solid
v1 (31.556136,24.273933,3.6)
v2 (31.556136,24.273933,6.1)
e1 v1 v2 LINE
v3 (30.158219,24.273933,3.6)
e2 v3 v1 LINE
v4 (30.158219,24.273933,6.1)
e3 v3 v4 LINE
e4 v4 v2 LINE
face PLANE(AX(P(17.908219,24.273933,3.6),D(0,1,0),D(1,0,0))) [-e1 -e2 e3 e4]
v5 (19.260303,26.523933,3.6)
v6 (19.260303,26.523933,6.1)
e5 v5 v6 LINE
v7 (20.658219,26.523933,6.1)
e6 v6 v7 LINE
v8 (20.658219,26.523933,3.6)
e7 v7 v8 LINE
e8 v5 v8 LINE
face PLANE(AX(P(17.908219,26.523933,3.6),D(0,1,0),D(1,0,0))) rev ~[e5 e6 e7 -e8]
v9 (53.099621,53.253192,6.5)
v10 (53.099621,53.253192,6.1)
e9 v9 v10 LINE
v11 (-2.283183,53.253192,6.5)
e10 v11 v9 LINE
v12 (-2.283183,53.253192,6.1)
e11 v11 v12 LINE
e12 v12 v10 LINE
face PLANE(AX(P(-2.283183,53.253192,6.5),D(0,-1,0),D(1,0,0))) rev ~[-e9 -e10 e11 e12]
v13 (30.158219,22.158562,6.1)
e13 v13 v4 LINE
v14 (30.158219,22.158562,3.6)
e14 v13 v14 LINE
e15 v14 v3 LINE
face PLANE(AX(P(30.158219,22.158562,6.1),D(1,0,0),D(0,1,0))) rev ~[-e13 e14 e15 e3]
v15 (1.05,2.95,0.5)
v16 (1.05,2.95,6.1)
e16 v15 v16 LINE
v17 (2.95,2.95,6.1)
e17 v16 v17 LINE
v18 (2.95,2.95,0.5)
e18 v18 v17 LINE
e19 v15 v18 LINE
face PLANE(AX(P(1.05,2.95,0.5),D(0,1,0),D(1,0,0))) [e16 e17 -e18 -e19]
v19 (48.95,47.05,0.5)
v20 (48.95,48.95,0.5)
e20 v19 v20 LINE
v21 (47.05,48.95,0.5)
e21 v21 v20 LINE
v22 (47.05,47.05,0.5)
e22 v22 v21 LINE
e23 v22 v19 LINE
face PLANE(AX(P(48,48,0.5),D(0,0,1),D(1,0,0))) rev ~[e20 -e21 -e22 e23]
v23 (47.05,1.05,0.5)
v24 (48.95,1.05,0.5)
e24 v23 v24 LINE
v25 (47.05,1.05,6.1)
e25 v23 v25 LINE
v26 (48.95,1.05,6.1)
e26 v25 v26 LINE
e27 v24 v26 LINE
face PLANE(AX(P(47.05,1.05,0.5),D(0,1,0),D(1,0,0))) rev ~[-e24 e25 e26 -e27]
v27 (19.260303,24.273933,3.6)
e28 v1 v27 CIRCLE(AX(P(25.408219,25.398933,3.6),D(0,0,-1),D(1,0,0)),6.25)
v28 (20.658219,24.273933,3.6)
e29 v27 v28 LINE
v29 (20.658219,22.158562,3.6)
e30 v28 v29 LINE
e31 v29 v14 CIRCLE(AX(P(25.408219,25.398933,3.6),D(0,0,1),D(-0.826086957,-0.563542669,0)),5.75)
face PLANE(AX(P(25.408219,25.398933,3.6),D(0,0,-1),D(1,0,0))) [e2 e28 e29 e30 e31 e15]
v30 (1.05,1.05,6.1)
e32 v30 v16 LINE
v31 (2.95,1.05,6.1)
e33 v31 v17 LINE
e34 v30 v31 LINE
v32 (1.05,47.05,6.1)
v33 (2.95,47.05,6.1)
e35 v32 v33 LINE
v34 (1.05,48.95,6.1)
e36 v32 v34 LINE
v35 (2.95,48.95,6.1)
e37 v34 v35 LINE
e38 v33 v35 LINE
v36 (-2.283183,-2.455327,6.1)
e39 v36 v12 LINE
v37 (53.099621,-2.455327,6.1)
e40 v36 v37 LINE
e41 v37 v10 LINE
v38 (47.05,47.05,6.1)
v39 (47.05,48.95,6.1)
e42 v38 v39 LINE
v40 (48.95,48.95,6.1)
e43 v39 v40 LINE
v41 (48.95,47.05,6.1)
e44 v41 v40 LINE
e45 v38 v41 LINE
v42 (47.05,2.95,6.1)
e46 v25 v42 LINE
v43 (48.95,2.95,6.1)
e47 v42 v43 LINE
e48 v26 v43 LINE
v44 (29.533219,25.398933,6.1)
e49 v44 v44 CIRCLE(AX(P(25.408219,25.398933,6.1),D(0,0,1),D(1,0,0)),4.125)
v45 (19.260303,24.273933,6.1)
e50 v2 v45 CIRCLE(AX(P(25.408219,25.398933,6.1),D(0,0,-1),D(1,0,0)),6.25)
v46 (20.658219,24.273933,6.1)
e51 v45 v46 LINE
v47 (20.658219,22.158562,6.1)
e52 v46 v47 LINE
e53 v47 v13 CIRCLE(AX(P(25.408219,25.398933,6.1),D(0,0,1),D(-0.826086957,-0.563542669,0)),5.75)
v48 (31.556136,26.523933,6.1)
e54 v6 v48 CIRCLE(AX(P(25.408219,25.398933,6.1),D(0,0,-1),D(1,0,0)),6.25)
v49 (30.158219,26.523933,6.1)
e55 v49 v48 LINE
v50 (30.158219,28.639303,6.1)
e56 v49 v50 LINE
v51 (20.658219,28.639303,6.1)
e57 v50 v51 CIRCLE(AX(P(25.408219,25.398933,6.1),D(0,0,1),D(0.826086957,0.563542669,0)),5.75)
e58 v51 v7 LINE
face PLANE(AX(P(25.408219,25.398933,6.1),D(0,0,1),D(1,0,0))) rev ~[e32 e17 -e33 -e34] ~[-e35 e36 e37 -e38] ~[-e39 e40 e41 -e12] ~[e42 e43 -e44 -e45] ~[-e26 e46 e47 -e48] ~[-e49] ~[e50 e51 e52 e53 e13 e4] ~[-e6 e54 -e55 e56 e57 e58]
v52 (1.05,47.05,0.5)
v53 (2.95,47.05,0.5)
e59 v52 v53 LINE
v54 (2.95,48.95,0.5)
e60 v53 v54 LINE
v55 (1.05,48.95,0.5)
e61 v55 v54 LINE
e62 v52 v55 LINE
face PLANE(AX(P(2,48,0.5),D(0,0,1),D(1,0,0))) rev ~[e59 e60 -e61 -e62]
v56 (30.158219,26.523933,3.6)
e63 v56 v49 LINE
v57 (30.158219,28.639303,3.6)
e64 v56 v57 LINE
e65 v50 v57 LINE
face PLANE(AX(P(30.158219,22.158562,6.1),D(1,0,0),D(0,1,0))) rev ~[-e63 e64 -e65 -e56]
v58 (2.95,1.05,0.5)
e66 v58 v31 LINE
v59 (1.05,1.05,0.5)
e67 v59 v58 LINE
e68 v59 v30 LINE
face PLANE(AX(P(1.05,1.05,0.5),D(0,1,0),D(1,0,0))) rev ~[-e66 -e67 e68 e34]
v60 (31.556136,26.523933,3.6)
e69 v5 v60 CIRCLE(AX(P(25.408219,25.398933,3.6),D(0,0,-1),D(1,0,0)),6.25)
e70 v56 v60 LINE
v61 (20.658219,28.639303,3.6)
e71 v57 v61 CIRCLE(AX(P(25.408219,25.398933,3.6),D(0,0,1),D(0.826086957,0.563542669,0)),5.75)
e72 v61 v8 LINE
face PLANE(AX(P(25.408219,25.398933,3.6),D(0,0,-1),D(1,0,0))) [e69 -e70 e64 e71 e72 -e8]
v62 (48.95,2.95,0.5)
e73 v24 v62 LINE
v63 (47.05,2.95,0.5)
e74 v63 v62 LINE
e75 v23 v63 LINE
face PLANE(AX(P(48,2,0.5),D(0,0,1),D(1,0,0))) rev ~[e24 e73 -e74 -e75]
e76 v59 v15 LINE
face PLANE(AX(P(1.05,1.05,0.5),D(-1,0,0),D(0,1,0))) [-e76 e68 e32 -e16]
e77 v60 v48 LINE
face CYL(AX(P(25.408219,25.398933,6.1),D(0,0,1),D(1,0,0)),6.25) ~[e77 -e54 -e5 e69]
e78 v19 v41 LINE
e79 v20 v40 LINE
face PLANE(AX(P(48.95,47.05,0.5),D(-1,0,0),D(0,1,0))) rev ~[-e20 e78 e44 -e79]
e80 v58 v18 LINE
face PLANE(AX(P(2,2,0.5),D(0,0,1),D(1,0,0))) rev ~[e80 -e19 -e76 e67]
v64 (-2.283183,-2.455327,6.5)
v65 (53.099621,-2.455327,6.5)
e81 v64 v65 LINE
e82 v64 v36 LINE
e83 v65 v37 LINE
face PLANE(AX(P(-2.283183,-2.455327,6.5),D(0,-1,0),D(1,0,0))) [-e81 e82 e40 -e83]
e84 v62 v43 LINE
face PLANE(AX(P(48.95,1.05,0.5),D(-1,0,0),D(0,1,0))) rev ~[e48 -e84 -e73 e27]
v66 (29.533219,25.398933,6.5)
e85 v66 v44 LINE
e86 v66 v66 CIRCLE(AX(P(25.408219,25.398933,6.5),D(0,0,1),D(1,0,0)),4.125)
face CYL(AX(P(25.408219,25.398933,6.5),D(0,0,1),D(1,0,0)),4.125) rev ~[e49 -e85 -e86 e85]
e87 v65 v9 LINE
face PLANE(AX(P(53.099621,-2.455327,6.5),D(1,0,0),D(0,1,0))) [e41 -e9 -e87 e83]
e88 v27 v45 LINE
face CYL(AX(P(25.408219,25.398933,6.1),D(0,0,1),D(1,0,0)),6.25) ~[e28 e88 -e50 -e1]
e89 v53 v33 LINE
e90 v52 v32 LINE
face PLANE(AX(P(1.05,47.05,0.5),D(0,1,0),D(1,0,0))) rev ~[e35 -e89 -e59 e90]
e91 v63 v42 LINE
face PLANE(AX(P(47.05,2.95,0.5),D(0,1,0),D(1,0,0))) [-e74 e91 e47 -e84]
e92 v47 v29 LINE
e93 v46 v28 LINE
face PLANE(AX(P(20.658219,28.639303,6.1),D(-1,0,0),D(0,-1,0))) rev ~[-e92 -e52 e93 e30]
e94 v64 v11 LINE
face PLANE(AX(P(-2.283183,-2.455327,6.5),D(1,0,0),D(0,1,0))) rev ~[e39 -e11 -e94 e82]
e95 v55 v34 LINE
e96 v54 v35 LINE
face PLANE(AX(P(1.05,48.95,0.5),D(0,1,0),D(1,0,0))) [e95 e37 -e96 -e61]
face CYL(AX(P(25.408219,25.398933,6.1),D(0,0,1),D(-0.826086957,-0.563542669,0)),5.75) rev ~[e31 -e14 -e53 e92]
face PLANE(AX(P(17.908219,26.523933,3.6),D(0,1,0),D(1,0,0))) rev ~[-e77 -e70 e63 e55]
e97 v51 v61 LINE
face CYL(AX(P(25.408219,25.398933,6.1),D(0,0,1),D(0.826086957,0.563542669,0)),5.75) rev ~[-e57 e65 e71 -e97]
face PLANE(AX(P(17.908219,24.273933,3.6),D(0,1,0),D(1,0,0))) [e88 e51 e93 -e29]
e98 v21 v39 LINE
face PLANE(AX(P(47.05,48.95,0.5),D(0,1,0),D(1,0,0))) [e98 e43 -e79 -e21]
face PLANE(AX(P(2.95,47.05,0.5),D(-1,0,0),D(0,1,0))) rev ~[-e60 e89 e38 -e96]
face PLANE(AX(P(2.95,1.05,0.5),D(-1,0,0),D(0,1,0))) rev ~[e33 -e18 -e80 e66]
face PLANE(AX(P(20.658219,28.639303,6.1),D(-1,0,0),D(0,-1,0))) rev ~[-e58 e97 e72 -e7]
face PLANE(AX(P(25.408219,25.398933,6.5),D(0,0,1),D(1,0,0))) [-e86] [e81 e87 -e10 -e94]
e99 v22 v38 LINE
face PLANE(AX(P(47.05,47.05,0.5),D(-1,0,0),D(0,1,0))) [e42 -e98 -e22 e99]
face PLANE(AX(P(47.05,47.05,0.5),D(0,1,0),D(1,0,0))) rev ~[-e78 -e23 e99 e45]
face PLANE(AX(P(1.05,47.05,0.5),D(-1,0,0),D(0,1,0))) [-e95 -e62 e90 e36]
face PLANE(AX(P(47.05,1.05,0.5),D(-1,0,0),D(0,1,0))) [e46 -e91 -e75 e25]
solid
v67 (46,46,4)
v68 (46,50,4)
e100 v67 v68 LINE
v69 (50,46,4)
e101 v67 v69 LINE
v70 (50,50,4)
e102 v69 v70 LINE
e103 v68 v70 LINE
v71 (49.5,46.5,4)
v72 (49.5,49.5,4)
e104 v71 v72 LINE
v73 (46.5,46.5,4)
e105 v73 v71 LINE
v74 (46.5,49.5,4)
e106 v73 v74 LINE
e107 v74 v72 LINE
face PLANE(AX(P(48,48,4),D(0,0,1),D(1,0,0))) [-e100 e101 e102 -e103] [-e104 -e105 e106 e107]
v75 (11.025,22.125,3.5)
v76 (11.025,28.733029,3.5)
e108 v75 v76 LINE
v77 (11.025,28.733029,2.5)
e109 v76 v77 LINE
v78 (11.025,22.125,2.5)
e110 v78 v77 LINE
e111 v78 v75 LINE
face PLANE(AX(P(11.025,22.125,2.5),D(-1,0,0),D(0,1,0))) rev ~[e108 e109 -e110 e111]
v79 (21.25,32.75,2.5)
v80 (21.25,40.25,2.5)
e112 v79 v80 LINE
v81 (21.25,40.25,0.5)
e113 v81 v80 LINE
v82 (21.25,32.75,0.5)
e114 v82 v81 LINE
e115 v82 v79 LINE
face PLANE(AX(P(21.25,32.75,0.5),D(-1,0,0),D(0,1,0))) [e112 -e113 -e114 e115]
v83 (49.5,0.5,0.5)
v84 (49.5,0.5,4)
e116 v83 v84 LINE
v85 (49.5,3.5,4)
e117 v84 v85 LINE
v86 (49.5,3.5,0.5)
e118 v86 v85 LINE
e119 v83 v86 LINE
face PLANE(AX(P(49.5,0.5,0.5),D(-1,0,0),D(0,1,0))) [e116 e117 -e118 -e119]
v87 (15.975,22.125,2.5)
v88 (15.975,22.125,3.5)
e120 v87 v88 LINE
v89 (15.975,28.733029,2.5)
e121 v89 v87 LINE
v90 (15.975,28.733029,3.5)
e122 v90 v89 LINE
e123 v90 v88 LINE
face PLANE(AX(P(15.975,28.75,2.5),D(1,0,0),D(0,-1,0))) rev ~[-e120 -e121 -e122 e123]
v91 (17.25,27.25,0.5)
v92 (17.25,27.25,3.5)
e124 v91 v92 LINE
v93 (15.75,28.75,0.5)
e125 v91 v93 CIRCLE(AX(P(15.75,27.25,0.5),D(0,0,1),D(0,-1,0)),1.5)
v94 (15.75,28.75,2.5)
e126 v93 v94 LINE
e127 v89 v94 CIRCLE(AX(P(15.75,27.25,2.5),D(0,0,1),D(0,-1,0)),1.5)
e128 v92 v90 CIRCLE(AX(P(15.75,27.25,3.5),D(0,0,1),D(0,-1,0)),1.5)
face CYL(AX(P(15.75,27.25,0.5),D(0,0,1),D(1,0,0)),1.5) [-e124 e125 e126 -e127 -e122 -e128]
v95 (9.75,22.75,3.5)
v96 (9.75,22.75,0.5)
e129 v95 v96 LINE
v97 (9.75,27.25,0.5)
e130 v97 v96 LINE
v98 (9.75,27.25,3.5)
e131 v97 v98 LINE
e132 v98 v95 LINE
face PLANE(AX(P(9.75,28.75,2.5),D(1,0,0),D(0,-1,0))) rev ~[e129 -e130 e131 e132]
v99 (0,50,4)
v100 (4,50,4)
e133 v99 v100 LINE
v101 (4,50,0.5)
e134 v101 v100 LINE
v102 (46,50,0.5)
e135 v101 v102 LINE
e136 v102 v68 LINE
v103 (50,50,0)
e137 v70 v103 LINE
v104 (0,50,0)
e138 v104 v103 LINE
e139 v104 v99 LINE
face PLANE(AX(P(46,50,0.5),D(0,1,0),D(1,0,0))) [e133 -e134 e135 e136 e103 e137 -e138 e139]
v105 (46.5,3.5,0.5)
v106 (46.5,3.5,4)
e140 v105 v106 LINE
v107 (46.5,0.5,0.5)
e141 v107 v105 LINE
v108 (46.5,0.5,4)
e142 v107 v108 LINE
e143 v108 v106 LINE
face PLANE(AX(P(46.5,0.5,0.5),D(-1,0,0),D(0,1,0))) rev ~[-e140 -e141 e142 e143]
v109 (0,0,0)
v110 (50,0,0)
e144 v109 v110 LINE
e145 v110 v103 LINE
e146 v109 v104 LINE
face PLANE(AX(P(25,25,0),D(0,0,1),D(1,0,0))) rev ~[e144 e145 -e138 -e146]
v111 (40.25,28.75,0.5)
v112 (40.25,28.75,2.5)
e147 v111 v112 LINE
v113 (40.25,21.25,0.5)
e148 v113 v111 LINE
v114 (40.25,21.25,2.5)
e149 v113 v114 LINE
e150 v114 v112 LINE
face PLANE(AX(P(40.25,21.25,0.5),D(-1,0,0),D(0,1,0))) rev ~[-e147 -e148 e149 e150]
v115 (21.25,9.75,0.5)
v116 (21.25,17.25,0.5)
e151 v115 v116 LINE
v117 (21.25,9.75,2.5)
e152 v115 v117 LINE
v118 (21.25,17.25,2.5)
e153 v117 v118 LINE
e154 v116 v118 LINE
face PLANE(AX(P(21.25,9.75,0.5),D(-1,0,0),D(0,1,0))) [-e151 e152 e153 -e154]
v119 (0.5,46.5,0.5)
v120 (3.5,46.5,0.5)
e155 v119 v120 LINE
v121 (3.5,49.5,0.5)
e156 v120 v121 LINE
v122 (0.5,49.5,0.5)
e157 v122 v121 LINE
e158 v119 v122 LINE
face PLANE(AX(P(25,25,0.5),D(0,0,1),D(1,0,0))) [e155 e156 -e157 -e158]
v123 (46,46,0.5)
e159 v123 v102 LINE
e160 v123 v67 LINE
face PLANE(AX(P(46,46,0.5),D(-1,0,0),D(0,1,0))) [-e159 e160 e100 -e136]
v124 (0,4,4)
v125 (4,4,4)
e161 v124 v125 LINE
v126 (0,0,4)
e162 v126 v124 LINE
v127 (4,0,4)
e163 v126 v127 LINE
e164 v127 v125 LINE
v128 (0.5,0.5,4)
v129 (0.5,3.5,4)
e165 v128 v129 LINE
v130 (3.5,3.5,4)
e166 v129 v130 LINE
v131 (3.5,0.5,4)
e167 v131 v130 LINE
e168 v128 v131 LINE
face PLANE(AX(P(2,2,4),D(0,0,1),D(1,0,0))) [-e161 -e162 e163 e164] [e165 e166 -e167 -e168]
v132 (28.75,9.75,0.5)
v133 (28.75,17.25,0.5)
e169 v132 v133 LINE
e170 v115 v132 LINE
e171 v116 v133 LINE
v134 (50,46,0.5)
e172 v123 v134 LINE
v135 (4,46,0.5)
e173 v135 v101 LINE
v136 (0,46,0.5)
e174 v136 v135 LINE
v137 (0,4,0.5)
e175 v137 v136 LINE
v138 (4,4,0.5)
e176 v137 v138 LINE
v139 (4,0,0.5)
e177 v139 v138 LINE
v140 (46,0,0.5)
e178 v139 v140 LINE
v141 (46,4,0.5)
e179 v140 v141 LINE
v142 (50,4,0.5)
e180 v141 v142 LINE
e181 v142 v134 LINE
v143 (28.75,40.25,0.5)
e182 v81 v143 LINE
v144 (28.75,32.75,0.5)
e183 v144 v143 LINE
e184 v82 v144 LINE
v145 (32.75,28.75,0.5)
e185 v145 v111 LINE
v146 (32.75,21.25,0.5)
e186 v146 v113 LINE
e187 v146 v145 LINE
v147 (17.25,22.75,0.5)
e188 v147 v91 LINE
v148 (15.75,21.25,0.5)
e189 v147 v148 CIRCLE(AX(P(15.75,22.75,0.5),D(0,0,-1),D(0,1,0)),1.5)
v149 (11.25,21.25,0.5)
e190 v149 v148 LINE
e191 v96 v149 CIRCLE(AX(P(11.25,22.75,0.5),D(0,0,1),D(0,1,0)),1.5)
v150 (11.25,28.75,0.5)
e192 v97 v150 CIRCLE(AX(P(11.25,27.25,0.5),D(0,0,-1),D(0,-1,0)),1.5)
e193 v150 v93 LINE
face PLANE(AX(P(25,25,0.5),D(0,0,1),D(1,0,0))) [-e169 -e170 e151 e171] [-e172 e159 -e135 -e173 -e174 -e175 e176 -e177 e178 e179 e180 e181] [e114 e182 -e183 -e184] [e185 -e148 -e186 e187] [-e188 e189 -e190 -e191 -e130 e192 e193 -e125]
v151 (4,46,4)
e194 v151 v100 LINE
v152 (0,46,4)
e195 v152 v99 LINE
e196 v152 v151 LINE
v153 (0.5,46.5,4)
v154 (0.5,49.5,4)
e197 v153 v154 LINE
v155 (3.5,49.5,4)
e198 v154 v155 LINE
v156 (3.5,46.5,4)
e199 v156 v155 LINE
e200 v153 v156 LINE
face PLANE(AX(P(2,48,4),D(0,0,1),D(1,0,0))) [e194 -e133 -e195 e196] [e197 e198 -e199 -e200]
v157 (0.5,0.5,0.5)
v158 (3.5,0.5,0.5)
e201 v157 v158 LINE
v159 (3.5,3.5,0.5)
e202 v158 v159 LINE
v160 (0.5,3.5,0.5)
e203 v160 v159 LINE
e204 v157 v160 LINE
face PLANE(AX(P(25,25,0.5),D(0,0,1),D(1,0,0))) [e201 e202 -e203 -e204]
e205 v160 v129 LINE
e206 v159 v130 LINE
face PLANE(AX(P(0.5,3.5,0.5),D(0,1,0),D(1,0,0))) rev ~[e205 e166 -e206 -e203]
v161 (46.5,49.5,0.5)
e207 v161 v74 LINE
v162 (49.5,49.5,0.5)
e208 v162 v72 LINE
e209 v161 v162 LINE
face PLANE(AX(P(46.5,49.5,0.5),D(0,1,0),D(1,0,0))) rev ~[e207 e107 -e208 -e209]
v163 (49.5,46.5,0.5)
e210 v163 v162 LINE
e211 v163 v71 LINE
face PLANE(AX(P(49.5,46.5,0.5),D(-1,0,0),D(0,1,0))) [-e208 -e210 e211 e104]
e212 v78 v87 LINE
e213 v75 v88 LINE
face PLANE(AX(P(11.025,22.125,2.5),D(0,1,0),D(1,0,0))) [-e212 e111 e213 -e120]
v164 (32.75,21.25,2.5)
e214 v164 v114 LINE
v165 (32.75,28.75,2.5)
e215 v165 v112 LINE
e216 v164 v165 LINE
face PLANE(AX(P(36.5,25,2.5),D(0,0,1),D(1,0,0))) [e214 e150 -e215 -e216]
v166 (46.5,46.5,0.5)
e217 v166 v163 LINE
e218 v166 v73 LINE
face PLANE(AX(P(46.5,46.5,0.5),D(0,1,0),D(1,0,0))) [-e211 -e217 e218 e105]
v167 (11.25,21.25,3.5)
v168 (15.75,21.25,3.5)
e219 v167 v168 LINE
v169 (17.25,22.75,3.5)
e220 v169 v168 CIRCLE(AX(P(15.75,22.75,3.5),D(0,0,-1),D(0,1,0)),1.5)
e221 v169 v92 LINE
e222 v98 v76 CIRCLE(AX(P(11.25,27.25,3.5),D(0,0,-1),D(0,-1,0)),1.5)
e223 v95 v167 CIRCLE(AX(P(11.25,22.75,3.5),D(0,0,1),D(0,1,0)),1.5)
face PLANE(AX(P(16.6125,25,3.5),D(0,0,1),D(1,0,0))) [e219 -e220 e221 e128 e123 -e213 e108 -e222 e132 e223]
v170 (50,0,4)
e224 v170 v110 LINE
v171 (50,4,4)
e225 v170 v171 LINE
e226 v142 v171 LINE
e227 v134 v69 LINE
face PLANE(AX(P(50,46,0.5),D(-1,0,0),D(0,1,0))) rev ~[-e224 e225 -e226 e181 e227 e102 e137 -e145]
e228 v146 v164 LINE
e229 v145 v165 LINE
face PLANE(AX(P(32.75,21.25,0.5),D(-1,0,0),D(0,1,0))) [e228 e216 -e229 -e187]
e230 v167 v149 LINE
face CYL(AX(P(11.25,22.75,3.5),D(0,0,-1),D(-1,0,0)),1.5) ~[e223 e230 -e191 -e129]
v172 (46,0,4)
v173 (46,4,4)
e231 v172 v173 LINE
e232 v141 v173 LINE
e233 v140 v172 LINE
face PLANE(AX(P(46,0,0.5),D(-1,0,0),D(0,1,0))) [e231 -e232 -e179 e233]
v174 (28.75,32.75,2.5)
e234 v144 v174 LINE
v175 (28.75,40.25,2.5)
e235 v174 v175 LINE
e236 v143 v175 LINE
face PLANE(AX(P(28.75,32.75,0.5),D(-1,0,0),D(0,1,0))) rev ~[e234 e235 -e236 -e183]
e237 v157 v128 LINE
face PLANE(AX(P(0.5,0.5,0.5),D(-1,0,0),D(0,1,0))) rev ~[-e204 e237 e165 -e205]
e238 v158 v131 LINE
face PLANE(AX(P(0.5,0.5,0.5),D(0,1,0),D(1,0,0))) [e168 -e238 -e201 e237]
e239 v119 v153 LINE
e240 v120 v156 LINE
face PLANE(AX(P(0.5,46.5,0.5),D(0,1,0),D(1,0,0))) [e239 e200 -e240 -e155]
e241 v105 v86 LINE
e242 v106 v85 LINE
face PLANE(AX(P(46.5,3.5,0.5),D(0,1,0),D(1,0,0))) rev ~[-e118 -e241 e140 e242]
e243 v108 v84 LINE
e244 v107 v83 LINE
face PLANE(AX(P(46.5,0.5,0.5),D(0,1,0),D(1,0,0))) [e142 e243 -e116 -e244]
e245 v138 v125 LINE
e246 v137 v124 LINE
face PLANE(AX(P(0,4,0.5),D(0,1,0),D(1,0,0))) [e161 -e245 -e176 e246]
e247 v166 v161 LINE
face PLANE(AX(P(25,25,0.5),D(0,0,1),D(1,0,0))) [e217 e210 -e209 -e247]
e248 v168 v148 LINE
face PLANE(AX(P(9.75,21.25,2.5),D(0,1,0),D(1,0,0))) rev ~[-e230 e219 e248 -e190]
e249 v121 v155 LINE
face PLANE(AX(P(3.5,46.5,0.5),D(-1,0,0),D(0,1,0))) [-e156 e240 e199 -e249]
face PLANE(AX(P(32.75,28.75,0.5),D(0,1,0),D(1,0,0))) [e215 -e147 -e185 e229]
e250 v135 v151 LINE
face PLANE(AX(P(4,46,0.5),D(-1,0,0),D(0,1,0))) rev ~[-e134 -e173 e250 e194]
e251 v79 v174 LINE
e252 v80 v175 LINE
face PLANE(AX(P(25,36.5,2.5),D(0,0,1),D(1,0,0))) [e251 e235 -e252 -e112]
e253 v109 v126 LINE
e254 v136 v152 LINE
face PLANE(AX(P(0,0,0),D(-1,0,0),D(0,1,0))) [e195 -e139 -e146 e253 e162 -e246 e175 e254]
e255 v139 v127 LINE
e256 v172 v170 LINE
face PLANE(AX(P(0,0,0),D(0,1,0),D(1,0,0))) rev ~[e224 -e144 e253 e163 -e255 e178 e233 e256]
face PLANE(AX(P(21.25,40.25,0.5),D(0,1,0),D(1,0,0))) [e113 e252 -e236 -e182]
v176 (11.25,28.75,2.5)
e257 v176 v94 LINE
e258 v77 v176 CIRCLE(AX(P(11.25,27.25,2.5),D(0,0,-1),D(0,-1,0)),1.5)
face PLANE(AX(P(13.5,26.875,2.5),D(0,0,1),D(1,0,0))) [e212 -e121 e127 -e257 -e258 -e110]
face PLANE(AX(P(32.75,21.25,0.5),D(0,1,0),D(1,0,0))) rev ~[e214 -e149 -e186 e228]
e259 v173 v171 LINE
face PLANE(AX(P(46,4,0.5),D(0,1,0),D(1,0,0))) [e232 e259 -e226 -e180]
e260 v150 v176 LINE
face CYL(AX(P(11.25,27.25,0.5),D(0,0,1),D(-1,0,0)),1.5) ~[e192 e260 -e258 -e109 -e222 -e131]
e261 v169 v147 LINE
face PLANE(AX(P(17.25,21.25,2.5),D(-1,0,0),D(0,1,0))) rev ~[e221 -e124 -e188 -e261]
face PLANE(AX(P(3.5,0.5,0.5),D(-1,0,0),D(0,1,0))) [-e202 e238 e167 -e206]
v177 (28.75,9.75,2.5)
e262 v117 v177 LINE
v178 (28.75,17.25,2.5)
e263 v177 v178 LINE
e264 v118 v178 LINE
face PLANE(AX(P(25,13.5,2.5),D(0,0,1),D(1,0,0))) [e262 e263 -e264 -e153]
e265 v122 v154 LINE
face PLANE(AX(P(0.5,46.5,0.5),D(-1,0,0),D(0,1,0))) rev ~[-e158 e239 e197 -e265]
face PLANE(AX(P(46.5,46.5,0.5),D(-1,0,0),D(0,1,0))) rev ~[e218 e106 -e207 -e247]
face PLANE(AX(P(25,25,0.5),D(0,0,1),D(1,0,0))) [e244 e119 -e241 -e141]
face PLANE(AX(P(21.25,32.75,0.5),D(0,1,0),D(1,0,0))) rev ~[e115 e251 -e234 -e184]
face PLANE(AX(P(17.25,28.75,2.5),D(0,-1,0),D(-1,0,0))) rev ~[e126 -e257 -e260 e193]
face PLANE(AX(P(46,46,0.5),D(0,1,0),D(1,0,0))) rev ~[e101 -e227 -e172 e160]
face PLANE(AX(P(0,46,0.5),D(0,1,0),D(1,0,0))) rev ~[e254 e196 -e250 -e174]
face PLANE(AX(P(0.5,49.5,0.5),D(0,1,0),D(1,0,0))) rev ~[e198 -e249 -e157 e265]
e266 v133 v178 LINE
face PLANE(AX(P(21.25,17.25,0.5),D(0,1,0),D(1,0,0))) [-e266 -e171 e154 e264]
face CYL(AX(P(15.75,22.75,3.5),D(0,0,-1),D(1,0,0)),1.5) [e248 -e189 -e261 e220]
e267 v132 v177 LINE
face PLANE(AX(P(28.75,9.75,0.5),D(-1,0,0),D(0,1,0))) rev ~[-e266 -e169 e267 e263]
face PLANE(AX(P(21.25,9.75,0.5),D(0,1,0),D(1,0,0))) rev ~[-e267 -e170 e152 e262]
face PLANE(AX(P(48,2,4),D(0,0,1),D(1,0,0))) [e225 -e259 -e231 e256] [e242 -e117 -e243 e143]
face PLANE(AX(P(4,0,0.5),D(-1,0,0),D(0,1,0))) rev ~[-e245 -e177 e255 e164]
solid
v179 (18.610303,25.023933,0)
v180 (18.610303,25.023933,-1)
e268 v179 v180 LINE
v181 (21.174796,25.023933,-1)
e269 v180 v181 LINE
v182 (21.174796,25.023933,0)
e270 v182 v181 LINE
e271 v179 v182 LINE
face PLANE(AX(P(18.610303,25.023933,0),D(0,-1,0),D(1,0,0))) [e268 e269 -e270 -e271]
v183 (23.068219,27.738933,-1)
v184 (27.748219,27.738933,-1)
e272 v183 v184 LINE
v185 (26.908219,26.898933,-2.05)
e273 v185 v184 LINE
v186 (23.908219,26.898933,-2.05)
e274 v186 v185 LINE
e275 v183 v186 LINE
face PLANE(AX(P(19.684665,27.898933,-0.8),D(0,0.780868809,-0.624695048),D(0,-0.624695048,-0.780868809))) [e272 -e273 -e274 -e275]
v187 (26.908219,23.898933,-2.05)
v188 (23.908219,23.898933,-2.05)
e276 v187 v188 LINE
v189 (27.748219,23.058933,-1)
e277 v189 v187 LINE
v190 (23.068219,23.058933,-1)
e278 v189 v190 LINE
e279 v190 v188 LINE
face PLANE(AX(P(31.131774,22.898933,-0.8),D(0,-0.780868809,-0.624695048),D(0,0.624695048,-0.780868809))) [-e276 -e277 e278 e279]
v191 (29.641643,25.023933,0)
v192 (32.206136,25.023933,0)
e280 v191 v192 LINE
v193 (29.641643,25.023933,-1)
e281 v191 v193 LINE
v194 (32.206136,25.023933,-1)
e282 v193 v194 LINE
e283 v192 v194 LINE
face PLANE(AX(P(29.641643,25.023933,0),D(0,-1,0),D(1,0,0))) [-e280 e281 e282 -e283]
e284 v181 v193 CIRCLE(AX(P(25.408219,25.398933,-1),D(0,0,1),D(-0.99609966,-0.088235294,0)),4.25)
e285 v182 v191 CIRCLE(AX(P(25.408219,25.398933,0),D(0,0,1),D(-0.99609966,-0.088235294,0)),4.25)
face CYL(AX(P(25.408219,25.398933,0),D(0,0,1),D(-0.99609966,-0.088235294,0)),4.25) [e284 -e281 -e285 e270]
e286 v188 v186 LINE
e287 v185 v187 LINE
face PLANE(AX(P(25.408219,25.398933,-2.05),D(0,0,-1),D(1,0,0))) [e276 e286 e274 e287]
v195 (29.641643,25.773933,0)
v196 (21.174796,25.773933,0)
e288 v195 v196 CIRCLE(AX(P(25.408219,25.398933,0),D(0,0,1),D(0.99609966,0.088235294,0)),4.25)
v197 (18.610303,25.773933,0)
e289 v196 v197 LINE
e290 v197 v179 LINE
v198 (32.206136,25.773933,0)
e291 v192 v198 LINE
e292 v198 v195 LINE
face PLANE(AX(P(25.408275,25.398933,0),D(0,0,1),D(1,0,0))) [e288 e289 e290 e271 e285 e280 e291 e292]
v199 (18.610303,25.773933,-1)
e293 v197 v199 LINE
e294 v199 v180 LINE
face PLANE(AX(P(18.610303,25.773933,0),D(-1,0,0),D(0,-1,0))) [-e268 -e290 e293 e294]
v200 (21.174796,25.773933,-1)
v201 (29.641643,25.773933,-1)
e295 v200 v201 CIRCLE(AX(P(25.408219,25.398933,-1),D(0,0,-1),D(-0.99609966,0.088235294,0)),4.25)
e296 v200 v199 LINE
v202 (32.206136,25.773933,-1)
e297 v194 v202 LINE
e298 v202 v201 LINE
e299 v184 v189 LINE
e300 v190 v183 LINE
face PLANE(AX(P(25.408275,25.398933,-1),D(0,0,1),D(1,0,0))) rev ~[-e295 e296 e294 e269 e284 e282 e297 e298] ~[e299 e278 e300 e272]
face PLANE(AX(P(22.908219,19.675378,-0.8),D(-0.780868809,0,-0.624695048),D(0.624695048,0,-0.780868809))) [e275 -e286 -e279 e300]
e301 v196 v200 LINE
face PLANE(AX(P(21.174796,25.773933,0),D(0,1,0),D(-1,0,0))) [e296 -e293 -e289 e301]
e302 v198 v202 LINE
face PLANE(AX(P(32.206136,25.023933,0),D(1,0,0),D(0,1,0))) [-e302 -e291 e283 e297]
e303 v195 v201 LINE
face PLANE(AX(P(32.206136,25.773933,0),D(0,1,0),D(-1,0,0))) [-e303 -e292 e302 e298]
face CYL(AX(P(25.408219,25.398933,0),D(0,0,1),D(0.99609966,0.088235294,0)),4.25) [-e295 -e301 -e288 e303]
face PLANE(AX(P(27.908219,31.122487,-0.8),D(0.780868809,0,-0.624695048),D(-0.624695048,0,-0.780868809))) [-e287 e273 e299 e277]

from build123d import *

# Parameters (mm, degrees)
F0_W          = 50
F0_H          = 50
F1_DEPTH      = 0.5
F2_W          = 4
F2_H          = 4
F2_W_2        = 3
F2_H_2        = 3
F3_DEPTH      = 3.5
F2_W_3        = 1.9
F2_H_3        = 1.9
F4_DEPTH      = 6
F5_W          = 55.382803781
F5_H          = 55.7085196488
F5_W_2        = 1.9
F5_H_2        = 1.9
F6_DEPTH      = 0.4
F7_R          = 4.125
F8_DEPTH      = 25
F9_R          = 6.25
F10_DEPTH     = 2.5
F11_W         = 7.5
F11_H         = 3.75
F11_H_2       = 7.5
F12_DEPTH     = 2
F13_W         = 4.95
F13_H         = 0.875
F14_DEPTH     = 1
F15_R         = 1.5
F16_W         = 15
F16_H         = 2.25
F17_DEPTH     = 2.5
F19_DEPTH     = 1
F20_W         = 5
F20_H         = 5
F21_DEPTH     = 1.05
F22_T4_DEPTH  = 11.4471090443
F22_T9_DEPTH  = 11.4471090443
F22_T14_DEPTH = 11.4471090443
F22_T19_DEPTH = 11.4471090443


# Not quite as in the source:
# - a fillet or chamfer that OpenCascade refuses, or shapes differently, is made with other operations: its cross-section is extruded or revolved along the edge and cut away or added
# - a feature names something its author has since deleted; it is built from what else it names


with BuildPart() as f1:
    # F0 (on Top) → F1 (new body)
    with BuildSketch(Plane.XY):
        with Locations((25, 25)):
            Rectangle(F0_W, F0_H)
    extrude(amount=F1_DEPTH)

    # F2 (on face) → F3 (join)
    with BuildSketch(Plane.XY.offset(0.5)):
        with Locations((48, 48)):
            Rectangle(F2_W, F2_H)
        with Locations((48, 48)):
            Rectangle(F2_W_2, F2_H_2, mode=Mode.SUBTRACT)
        with Locations((2, 48)):
            Rectangle(F2_W, F2_H)
        with Locations((2, 48)):
            Rectangle(F2_W_2, F2_H_2, mode=Mode.SUBTRACT)
        with Locations((2, 2)):
            Rectangle(F2_W, F2_H)
        with Locations((2, 2)):
            Rectangle(F2_W_2, F2_H_2, mode=Mode.SUBTRACT)
        with Locations((48, 2)):
            Rectangle(F2_W, F2_H)
        with Locations((48, 2)):
            Rectangle(F2_W_2, F2_H_2, mode=Mode.SUBTRACT)
    extrude(amount=F3_DEPTH)

    # F11 (on face) → F12 (join)
    with BuildSketch(Plane.XY.offset(0.5)):
        with Locations((13.5, 26.875)):
            Rectangle(F11_W, F11_H)
        with Locations((13.5, 23.125)):
            Rectangle(F11_W, F11_H)
        with Locations((25, 13.5)):
            Rectangle(F11_W, F11_H_2)
        with Locations((36.5, 25)):
            Rectangle(F11_W, F11_H_2)
        with Locations((25, 36.5)):
            Rectangle(F11_W, F11_H_2)
    extrude(amount=F12_DEPTH)

    # F13 (on face) → F14 (join)
    with BuildSketch(Plane.XY.offset(2.5)):
        Polygon((15.975, 22.125), (15.975, 21.25), (17.25, 21.25), (17.25, 28.75), (15.975, 28.75), align=None)
        with Locations((13.5, 21.6875)):
            Rectangle(F13_W, F13_H)
        Polygon((9.75, 21.25), (11.025, 21.25), (11.025, 22.125), (11.025, 28.75), (9.75, 28.75), align=None)
    extrude(amount=F14_DEPTH)

    # F15
    f15_edges = [f1.edges().sort_by_distance(p)[0] for p in [
        (9.75, 28.75, 2),
        (17.25, 28.75, 2),
        (17.25, 21.25, 2),
        (9.75, 21.25, 2),
    ]]
    fillet(f15_edges, radius=F15_R)


with BuildPart() as f4:
    # F2 (on face) → F4 (new body)
    with BuildSketch(Plane.XY.offset(0.5)):
        with Locations((2, 48)):
            Rectangle(F2_W_3, F2_H_3)
    extrude(amount=F4_DEPTH)



with BuildPart() as f4b:
    # F2 (on face) → F4, piece 2 (new body)
    with BuildSketch(Plane.XY.offset(0.5)):
        with Locations((48, 48)):
            Rectangle(F2_W_3, F2_H_3)
    extrude(amount=F4_DEPTH)


with BuildPart() as f4c:
    # F2 (on face) → F4, piece 3 (new body)
    with BuildSketch(Plane.XY.offset(0.5)):
        with Locations((48, 2)):
            Rectangle(F2_W_3, F2_H_3)
    extrude(amount=F4_DEPTH)


with BuildPart() as f4d:
    # F2 (on face) → F4, piece 4 (new body)
    with BuildSketch(Plane.XY.offset(0.5)):
        with Locations((2, 2)):
            Rectangle(F2_W_3, F2_H_3)
    extrude(amount=F4_DEPTH)


with BuildPart() as f4_1:
    add(f4.part)

    add(f4b.part)  # F6 merges F4b

    add(f4c.part)  # F6 merges F4c

    add(f4d.part)  # F6 merges F4d
    # F5 (on face) → F6 (join)
    with BuildSketch(Plane.XY.offset(6.5)):
        with Locations((25.4082191968, 25.3989326302)):
            Rectangle(F5_W, F5_H)
        with Locations((48, 48)):
            Rectangle(F5_W_2, F5_H_2, mode=Mode.SUBTRACT)
    extrude(amount=-F6_DEPTH)

    # F7 (on face) → F8 (cut)
    with BuildSketch(Plane.XY.offset(6.5)):
        with Locations((25.4082191968, 25.3989326302)):
            Circle(F7_R)
    extrude(amount=-F8_DEPTH, mode=Mode.SUBTRACT)

    # F9 (on face) → F10 (join)
    with BuildSketch(Plane(origin=(0, 0, 6.1), x_dir=(1, 0, 0), z_dir=(0, 0, -1))):
        with Locations((25.4082191968, -25.3989326302)):
            Circle(F9_R)
        with BuildLine():
            ThreePointArc((30.1582191968, -22.158562281), (30.9025344408, -23.7033501344), (31.1582191968, -25.3989326302))
            ThreePointArc((31.1582191968, -25.3989326302), (30.9025344408, -27.094515126), (30.1582191968, -28.6393029794))
            ThreePointArc((30.1582191968, -28.6393029794), (25.4082191968, -31.1489326302), (20.6582191968, -28.6393029794))
            ThreePointArc((20.6582191968, -28.6393029794), (19.6582191968, -25.3989326302), (20.6582191968, -22.158562281))
            ThreePointArc((20.6582191968, -22.158562281), (25.4082191968, -19.6489326302), (30.1582191968, -22.158562281))
        make_face(mode=Mode.SUBTRACT)
        with BuildLine():
            ThreePointArc((30.1582191968, -28.6393029794), (30.9025344408, -27.094515126), (31.1582191968, -25.3989326302))
            ThreePointArc((31.1582191968, -25.3989326302), (30.9025344408, -23.7033501344), (30.1582191968, -22.158562281))
            Line((30.1582191968, -22.158562281), (30.1582191968, -28.6393029794))
        make_face()
        with BuildLine():
            Line((20.6582191968, -28.6393029794), (20.6582191968, -22.158562281))
            ThreePointArc((20.6582191968, -22.158562281), (19.6582191968, -25.3989326302), (20.6582191968, -28.6393029794))
        make_face()
    extrude(amount=F10_DEPTH)

    # F16 (on face) → F17 (cut, through all)
    with BuildSketch(Plane(origin=(0, 0, 3.6), x_dir=(1, 0, 0), z_dir=(0, 0, -1))):
        with Locations((25.4082191968, -25.3989326302)):
            Rectangle(F16_W, F16_H)
    extrude(amount=-F17_DEPTH, mode=Mode.SUBTRACT)


with BuildPart() as f19:
    # F18 (on Top) → F19 (new body)
    with BuildSketch(Plane.XY):
        with BuildLine():
            ThreePointArc((29.6416427523, 25.0239326302), (29.6540730633, 25.2112495339), (29.6582191968, 25.3989326302))
            ThreePointArc((29.6582191968, 25.3989326302), (29.6540730633, 25.5866157265), (29.6416427523, 25.7739326302))
            Line((29.6416427523, 25.7739326302), (25.4082191968, 25.7739326302))
            Line((25.4082191968, 25.7739326302), (21.1747956414, 25.7739326302))
            ThreePointArc((21.1747956414, 25.7739326302), (21.1582191968, 25.3989326302), (21.1747956414, 25.0239326302))
            Line((21.1747956414, 25.0239326302), (25.4082191968, 25.0239326302))
            Line((25.4082191968, 25.0239326302), (29.6416427523, 25.0239326302))
        make_face()
        with BuildLine():
            ThreePointArc((29.6416427523, 25.7739326302), (29.6540730633, 25.5866157265), (29.6582191968, 25.3989326302))
            ThreePointArc((29.6582191968, 25.3989326302), (29.6540730633, 25.2112495339), (29.6416427523, 25.0239326302))
            Line((29.6416427523, 25.0239326302), (32.2061355105, 25.0239326302))
            Line((32.2061355105, 25.0239326302), (32.2061355105, 25.3989326302))
            Line((32.2061355105, 25.3989326302), (32.2061355105, 25.7739326302))
            Line((32.2061355105, 25.7739326302), (29.6416427523, 25.7739326302))
        make_face()
        with BuildLine():
            Line((25.4082191968, 25.7739326302), (29.6416427523, 25.7739326302))
            ThreePointArc((29.6416427523, 25.7739326302), (25.4082191968, 29.6489326302), (21.1747956414, 25.7739326302))
            Line((21.1747956414, 25.7739326302), (25.4082191968, 25.7739326302))
        make_face()
        with BuildLine():
            ThreePointArc((21.1747956414, 25.0239326302), (25.4082191968, 21.1489326302), (29.6416427523, 25.0239326302))
            Line((29.6416427523, 25.0239326302), (25.4082191968, 25.0239326302))
            Line((25.4082191968, 25.0239326302), (21.1747956414, 25.0239326302))
        make_face()
        with BuildLine():
            ThreePointArc((21.1747956414, 25.0239326302), (21.1582191968, 25.3989326302), (21.1747956414, 25.7739326302))
            Line((21.1747956414, 25.7739326302), (18.6103028832, 25.7739326302))
            Line((18.6103028832, 25.7739326302), (18.6103028832, 25.3989326302))
            Line((18.6103028832, 25.3989326302), (18.6103028832, 25.0239326302))
            Line((18.6103028832, 25.0239326302), (21.1747956414, 25.0239326302))
        make_face()
    extrude(amount=-F19_DEPTH)

    # F20 (on face) → F21 (join)
    with BuildSketch(Plane(origin=(0, 0, -1), x_dir=(1, 0, 0), z_dir=(0, 0, -1))):
        with Locations((25.4082191968, -25.3989326302)):
            Rectangle(F20_W, F20_H)
    extrude(amount=F21_DEPTH)

    # F22: chamfer of 1 x 1.25 on 4 edges, made by hand


with BuildPart() as f22_tool2:
    # F22_s3 → F22_t4 (new body)
    with BuildSketch(Plane.XZ.offset(-31.1224871524)):
        Polygon((27.9082191968, -0.8), (26.9082191968, -2.05), (27.9082191968, -2.05), align=None)
    extrude(amount=F22_T4_DEPTH)

    split(bisect_by=Plane.XY.offset(-1), keep=Keep.BOTTOM)


with BuildPart() as f19_1:
    add(f19.part)

    # F22_t1: cut F22_tool2
    add(f22_tool2.part, mode=Mode.SUBTRACT)


with BuildPart() as f22_tool7:
    # F22_s8 → F22_t9 (new body)
    with BuildSketch(Plane.YZ.offset(31.131773719)):
        Polygon((22.8989326302, -0.8), (23.8989326302, -2.05), (22.8989326302, -2.05), align=None)
    extrude(amount=-F22_T9_DEPTH)

    split(bisect_by=Plane.XY.offset(-1), keep=Keep.BOTTOM)


with BuildPart() as f19_2:
    add(f19_1.part)

    # F22_t6: cut F22_tool7
    add(f22_tool7.part, mode=Mode.SUBTRACT)


with BuildPart() as f22_tool12:
    # F22_s13 → F22_t14 (new body)
    with BuildSketch(Plane.XZ.offset(-19.675378108)):
        Polygon((22.9082191968, -0.8), (23.9082191968, -2.05), (22.9082191968, -2.05), align=None)
    extrude(amount=-F22_T14_DEPTH)

    split(bisect_by=Plane.XY.offset(-1), keep=Keep.BOTTOM)


with BuildPart() as f19_3:
    add(f19_2.part)

    # F22_t11: cut F22_tool12
    add(f22_tool12.part, mode=Mode.SUBTRACT)


with BuildPart() as f22_tool17:
    # F22_s18 → F22_t19 (new body)
    with BuildSketch(Plane.YZ.offset(19.6846646747)):
        Polygon((27.8989326302, -0.8), (26.8989326302, -2.05), (27.8989326302, -2.05), align=None)
    extrude(amount=F22_T19_DEPTH)

    split(bisect_by=Plane.XY.offset(-1), keep=Keep.BOTTOM)


with BuildPart() as f19_4:
    add(f19_3.part)

    # F22_t16: cut F22_tool17
    add(f22_tool17.part, mode=Mode.SUBTRACT)


solid = Compound([f1.part, f4_1.part, f19_4.part])
